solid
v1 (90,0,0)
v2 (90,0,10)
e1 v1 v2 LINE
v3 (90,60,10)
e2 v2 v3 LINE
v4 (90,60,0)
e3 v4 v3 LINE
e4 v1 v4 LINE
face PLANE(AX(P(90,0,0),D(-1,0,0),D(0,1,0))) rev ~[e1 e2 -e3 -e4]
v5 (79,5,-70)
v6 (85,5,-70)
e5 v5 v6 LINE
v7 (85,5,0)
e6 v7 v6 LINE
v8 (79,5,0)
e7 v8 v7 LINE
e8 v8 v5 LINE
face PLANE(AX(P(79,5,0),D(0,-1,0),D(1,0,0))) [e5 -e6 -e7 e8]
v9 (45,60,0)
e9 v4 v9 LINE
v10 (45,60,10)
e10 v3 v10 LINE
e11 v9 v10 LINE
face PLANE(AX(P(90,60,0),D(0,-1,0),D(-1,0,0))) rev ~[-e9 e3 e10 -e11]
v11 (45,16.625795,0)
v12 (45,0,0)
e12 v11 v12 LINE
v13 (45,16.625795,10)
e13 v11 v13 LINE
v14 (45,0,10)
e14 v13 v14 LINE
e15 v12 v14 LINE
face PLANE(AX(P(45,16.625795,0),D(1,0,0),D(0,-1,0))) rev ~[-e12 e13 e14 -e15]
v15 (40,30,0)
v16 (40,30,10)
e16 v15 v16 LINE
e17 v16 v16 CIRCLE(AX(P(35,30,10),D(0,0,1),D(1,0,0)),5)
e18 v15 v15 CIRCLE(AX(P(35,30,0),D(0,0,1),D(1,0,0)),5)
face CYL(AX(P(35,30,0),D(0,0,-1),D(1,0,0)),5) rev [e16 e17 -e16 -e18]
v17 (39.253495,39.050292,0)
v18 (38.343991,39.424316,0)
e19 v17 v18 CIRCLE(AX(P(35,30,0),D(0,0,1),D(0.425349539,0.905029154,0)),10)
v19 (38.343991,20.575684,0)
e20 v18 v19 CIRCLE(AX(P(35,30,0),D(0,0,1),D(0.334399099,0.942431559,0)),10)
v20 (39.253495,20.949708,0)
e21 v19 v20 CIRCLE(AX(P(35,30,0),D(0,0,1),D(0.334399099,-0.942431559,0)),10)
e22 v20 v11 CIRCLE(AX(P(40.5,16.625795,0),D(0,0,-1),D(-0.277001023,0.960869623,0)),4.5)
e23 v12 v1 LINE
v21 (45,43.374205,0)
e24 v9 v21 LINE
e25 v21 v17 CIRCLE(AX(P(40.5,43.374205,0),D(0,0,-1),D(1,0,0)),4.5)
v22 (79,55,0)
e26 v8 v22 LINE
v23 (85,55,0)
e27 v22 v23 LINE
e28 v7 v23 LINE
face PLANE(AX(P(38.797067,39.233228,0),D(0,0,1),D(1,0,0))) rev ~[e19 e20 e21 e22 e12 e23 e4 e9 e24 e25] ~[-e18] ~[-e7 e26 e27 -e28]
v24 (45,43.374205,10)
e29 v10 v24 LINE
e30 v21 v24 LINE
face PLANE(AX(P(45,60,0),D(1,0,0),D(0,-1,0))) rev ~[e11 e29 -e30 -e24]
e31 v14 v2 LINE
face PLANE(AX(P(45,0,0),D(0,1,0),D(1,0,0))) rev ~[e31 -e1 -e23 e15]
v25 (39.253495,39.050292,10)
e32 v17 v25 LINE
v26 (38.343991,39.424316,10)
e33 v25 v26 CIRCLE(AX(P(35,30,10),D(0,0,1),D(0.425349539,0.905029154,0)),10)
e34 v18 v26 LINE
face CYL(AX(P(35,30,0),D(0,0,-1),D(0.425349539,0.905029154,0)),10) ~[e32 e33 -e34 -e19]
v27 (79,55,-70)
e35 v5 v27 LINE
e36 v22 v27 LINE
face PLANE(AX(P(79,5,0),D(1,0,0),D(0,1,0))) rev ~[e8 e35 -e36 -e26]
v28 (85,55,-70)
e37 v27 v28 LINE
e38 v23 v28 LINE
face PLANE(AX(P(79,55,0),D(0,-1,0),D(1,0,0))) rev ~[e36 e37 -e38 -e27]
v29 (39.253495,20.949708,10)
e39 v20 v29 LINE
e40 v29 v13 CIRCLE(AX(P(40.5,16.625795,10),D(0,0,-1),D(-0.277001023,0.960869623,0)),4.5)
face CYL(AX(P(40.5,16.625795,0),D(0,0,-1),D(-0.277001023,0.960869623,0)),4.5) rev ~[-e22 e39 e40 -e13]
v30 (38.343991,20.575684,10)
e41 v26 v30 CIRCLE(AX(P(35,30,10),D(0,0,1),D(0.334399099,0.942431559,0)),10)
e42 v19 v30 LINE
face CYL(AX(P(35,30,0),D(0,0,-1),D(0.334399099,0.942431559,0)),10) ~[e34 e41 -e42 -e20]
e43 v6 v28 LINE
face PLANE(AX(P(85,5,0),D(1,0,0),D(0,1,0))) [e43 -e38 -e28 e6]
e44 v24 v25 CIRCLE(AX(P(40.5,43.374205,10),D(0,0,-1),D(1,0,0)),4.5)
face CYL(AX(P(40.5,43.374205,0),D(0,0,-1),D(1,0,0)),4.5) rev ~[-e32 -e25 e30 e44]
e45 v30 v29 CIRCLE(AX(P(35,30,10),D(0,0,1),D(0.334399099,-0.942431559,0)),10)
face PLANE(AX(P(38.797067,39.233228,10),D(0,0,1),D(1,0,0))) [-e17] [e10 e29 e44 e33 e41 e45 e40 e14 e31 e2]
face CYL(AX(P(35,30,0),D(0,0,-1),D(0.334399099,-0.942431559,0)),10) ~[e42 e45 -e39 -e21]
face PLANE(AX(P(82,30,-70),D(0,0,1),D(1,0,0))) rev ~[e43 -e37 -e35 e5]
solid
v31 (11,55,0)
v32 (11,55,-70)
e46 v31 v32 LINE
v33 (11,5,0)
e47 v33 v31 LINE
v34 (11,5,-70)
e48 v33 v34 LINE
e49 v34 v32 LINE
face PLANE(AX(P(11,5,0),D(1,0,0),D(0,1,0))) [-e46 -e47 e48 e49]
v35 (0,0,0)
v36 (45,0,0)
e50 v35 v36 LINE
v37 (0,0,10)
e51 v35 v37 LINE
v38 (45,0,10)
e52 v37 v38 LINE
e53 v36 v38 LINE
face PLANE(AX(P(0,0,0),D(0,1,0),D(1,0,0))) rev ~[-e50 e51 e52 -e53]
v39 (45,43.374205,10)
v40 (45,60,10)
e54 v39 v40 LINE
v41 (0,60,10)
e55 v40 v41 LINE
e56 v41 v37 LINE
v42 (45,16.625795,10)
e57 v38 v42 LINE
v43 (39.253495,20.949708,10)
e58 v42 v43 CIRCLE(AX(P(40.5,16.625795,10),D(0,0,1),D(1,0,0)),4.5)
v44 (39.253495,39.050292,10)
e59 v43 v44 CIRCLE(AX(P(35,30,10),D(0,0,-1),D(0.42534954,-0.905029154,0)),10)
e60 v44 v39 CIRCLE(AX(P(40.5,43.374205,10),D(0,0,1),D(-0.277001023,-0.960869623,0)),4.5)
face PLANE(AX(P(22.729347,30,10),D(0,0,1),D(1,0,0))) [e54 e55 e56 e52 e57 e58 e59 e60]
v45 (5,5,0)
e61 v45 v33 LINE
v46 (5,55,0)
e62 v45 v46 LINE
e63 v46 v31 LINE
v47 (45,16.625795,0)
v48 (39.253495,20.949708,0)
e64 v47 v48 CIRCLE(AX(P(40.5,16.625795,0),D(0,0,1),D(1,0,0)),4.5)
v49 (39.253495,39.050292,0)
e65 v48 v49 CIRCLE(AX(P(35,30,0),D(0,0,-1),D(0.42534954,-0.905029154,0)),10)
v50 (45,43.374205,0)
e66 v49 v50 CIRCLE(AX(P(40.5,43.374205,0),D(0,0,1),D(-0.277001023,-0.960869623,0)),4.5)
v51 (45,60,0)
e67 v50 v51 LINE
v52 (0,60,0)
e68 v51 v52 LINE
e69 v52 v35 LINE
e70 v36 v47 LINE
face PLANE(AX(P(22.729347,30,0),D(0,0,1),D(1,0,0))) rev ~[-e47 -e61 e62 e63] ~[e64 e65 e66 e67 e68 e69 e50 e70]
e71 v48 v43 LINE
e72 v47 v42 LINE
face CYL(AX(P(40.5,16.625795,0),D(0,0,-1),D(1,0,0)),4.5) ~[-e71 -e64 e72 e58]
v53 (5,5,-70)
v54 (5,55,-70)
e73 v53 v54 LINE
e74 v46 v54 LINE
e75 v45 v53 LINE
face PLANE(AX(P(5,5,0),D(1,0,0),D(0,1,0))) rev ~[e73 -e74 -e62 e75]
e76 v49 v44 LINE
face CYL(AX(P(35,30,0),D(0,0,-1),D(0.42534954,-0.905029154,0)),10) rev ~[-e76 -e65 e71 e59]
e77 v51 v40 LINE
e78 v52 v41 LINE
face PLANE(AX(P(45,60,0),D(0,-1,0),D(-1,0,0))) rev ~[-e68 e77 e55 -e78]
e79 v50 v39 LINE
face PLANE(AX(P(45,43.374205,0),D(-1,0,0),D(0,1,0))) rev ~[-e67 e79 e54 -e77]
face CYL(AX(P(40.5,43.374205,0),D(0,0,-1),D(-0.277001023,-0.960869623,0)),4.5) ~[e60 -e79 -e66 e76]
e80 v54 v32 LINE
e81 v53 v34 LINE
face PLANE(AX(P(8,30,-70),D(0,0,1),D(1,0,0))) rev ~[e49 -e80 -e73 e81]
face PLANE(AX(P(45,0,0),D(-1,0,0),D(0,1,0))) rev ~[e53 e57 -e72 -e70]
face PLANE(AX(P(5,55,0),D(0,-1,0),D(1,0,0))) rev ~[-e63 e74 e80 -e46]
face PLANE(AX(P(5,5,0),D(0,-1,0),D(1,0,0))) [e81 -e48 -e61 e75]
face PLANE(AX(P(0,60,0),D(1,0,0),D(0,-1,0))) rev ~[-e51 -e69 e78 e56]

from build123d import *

# Parameters (mm, degrees)
F1_DEPTH = 10
F2_R     = 5
F3_DEPTH = 10
F4_W     = 6
F4_H     = 50
F5_DEPTH = 70


with BuildPart() as f1:
    # F0 (on Top) → F1 (new body)
    with BuildSketch(Plane.XY):
        with BuildLine():
            Line((0, 60), (0, 0))
            Line((0, 0), (45, 0))
            Line((45, 0), (45, 16.625795157))
            ThreePointArc((45, 16.625795157), (43.2056172384, 20.2215753726), (39.2534953958, 20.9497084623))
            ThreePointArc((39.2534953958, 20.9497084623), (25, 30), (39.2534953958, 39.0502915377))
            ThreePointArc((39.2534953958, 39.0502915377), (43.2056172384, 39.7784246274), (45, 43.374204843))
            Line((45, 43.374204843), (45, 60))
            Line((45, 60), (0, 60))
        make_face()
    extrude(amount=F1_DEPTH)

    # F4 (on Top) → F5 (join)
    with BuildSketch(Plane.XY):
        with Locations((8, 30)):
            Rectangle(F4_W, F4_H)
    extrude(amount=-F5_DEPTH)


with BuildPart() as f3:
    # F2 (on Top) → F3 (new body)
    with BuildSketch(Plane.XY):
        with BuildLine():
            ThreePointArc((38.3439909876, 39.4243155866), (38.788495333, 39.2123841147), (39.2534953958, 39.0502915377))
            ThreePointArc((39.2534953958, 39.0502915377), (38.8033437044, 39.2484905074), (38.3439909876, 39.4243155866))
        make_face()
        with BuildLine():
            ThreePointArc((45, 43.374204843), (43.2056172384, 39.7784246274), (39.2534953958, 39.0502915377))
            ThreePointArc((39.2534953958, 39.0502915377), (38.788495333, 39.2123841147), (38.3439909876, 39.4243155866))
            ThreePointArc((38.3439909876, 39.4243155866), (25, 30), (38.3439909876, 20.5756844134))
            ThreePointArc((38.3439909876, 20.5756844134), (38.788495333, 20.7876158853), (39.2534953958, 20.9497084623))
            ThreePointArc((39.2534953958, 20.9497084623), (43.2056172384, 20.2215753726), (45, 16.625795157))
            Line((45, 16.625795157), (45, 0))
            Line((45, 0), (90, 0))
            Line((90, 0), (90, 60))
            Line((90, 60), (45, 60))
            Line((45, 60), (45, 43.374204843))
        make_face()
        with Locations((35, 30)):
            Circle(F2_R, mode=Mode.SUBTRACT)
        with BuildLine():
            ThreePointArc((39.2534953958, 20.9497084623), (38.788495333, 20.7876158853), (38.3439909876, 20.5756844134))
            ThreePointArc((38.3439909876, 20.5756844134), (38.8033437044, 20.7515094926), (39.2534953958, 20.9497084623))
        make_face()
    extrude(amount=F3_DEPTH)

    # F4 (on Top) → F5, piece 2 (join)
    with BuildSketch(Plane.XY):
        with Locations((82, 30)):
            Rectangle(F4_W, F4_H)
    extrude(amount=-F5_DEPTH)


solid = Compound([f1.part, f3.part])
